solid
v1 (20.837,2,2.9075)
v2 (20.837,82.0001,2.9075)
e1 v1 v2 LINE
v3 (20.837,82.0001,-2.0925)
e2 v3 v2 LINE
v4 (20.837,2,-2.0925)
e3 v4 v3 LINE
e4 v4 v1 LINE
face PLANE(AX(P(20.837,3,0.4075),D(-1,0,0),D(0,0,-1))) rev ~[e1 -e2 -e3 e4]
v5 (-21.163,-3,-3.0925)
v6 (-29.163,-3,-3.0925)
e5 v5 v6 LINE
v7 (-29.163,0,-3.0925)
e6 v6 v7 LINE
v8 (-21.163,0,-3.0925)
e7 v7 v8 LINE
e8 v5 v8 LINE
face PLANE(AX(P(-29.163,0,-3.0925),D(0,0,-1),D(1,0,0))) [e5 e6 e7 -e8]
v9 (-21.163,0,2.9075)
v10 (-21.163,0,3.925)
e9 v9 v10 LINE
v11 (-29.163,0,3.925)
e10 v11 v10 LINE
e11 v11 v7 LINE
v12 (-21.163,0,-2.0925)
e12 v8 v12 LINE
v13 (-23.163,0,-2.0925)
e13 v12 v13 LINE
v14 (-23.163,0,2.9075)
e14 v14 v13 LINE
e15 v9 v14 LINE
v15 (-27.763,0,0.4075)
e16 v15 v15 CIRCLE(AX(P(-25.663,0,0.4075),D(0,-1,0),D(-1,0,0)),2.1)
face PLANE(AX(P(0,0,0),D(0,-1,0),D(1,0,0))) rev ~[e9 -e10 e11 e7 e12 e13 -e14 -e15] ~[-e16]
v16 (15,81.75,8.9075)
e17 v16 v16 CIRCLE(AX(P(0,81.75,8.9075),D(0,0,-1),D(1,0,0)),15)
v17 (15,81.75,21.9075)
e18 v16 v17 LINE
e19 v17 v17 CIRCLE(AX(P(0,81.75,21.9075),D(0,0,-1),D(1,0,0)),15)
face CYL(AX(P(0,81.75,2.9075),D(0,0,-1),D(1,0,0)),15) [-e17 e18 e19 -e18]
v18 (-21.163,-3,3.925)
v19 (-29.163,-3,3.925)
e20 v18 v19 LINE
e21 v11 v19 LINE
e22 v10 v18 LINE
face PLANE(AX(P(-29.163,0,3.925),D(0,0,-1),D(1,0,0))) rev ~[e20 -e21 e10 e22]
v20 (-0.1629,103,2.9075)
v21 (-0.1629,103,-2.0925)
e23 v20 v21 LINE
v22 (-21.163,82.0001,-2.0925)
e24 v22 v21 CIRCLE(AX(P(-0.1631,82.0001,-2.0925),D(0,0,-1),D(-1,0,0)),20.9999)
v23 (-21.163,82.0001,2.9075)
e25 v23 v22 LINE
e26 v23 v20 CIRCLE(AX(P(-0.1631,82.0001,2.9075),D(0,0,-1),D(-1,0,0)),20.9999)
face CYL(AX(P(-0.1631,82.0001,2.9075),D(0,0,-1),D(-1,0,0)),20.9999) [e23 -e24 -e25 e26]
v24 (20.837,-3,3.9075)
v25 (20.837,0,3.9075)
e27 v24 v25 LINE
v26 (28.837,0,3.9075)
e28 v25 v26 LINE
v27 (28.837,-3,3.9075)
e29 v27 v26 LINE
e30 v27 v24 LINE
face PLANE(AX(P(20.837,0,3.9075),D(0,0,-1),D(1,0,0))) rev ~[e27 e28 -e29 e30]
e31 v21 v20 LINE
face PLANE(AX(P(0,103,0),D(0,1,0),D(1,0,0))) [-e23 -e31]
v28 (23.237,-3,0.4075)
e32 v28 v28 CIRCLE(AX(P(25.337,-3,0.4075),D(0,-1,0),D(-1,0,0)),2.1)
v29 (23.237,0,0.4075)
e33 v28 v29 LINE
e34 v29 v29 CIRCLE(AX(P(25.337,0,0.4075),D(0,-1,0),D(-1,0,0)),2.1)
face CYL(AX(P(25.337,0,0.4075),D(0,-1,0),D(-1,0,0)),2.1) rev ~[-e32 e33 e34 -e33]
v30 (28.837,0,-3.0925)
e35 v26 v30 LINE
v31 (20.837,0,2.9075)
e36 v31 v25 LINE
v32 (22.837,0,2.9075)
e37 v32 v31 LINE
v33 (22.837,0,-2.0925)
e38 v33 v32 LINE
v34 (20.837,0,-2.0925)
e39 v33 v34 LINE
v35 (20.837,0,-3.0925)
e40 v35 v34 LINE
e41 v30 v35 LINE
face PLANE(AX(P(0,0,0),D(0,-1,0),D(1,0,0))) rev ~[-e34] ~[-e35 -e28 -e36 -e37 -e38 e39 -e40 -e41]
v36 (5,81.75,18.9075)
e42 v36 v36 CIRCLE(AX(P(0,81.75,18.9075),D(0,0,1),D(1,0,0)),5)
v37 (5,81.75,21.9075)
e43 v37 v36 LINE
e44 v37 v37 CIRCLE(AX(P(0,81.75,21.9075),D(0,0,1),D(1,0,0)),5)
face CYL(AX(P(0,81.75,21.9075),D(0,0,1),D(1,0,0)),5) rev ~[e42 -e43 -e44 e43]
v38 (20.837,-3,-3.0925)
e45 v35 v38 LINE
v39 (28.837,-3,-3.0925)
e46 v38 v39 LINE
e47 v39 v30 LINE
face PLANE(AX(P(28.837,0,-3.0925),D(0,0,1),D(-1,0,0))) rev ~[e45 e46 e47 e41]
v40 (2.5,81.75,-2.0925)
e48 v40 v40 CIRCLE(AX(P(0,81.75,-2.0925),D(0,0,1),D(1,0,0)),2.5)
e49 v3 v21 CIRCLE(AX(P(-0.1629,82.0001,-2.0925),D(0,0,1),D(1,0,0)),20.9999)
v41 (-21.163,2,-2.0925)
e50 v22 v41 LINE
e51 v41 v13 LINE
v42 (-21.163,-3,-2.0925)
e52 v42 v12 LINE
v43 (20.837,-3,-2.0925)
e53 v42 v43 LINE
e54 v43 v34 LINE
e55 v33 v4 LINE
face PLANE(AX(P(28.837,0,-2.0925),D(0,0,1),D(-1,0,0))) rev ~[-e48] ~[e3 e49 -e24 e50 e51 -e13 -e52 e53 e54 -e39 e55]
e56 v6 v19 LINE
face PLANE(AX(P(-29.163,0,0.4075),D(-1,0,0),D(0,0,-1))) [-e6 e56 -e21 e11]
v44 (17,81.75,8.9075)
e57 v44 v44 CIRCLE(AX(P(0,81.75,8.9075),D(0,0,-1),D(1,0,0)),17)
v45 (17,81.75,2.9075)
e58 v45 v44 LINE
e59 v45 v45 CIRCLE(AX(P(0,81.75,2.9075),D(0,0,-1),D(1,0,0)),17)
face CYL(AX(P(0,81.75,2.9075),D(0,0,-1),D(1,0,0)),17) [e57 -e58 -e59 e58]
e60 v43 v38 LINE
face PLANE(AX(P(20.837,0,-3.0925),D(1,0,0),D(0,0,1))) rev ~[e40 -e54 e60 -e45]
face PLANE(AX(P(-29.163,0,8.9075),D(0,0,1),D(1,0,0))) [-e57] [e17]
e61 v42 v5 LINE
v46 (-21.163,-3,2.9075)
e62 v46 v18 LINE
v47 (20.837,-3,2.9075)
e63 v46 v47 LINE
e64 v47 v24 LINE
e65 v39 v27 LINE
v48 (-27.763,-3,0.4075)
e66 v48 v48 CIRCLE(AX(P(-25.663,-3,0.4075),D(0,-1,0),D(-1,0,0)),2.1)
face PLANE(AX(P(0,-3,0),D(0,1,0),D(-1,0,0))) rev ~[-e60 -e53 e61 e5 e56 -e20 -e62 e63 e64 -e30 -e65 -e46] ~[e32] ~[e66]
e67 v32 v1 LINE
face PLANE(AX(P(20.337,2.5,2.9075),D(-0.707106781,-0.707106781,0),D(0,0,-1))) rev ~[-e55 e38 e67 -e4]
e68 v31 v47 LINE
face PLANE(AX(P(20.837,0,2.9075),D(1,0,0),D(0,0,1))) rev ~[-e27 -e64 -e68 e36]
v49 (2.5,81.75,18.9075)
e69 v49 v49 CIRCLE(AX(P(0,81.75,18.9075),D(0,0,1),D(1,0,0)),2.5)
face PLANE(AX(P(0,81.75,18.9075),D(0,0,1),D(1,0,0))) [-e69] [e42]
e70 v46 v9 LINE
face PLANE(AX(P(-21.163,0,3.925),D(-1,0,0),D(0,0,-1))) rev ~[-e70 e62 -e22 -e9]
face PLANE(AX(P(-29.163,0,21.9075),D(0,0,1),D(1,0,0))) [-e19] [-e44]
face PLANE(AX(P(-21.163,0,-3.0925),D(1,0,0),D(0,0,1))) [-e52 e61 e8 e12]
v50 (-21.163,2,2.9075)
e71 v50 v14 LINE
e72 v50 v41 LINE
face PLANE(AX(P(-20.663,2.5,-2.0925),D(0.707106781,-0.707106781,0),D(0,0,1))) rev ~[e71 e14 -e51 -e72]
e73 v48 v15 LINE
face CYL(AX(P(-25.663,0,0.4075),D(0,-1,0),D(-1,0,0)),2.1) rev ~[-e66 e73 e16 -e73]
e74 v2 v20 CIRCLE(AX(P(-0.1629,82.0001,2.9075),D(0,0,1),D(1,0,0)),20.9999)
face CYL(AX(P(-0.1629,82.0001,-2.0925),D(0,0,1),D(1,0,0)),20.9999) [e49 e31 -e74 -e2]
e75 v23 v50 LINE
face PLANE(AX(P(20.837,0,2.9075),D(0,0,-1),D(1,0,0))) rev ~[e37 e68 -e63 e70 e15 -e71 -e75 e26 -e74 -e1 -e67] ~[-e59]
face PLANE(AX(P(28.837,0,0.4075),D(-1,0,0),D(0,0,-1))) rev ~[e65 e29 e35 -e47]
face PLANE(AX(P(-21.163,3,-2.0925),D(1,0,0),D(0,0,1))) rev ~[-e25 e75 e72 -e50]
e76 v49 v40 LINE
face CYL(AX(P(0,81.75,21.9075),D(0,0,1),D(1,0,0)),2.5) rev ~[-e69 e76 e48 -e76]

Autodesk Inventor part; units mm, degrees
ref_plane "YZ Plane" through (0, 0, 0) normal (1, 0, 0) x (0, 1, 0)
ref_plane "XZ Plane" through (0, 0, 0) normal (0, 1, 0) x (-1, 0, 0)
ref_plane "XY Plane" through (0, 0, 0) normal (0, 0, 1) x (1, 0, 0)
sketch "Szkic1" plane through (0, 0, 0) normal (0, 1, 0) x (-1, 0, 0)
  line L0 (-28.837, -2.0925) -> (29.163, -2.0925)
  line L1 (29.163, 2.9075) -> (29.163, -2.0925)
  line L2 (-28.837, -2.0925) -> (29.163, -2.0925)
  line L3 (29.163, -2.0925) -> (29.163, 2.9075)
  line L4 (29.163, 2.9075) -> (-28.837, 2.9075)
  line L5 (-28.837, 2.9075) -> (-28.837, -2.0925)
  circle A0 centre (-25.337, 0.4075) radius 2.1
  circle A1 centre (-25.337, 0.4075) radius 2.1
  circle A2 centre (25.663, 0.4075) radius 2.1
  circle A3 centre (25.663, 0.4075) radius 2.1
  line L6 (0.163, -2.0925) -> (0.163, 2.9075)
  line L7 (29.163, 0.4075) -> (-28.837, 0.4075)
  line L8 (-20.837, -2.0925) -> (21.163, -2.0925)
  line L9 (21.163, -2.0925) -> (21.163, 2.9075)
  line L10 (21.163, 2.9075) -> (-20.837, 2.9075)
  line L11 (-20.837, 2.9075) -> (-20.837, -2.0925)
  line L12 (-20.837, -2.0925) -> (21.163, 2.9075) construction
  line L13 (21.163, -2.0925) -> (-20.837, 2.9075) construction
  point P0 (0, 0)
  point P1 (0.163, 0.4075)
  dimension "d14" = 42
  dimension "d15" = 5
  dimension "d16" = 4.5
  dimension "d17" = 4.5
  dimension "d18" = 8
  dimension "d19" = 8
extrude "Wyciągnięcie proste1" add sketch "Szkic1" along normal blind 3 contours L5 L7 A0 L11 L0 | L11 L7 L6 L0 | L5 L4 L11 L7 A0 | L6 L7 L9 L0 | L11 L4 L6 L7 | L9 L7 A2 L1 L0 | L6 L4 L9 L7 | L9 L4 L1 L7 A2
sketch "Szkic2" plane through (0, 3, 0) normal (0, 1, 0) x (1, 0, 0)
  line L0 (-29.163, 2.0925) -> (-29.163, -2.9075) projected
  line L1 (-29.163, -0.4075) -> (-21.163, -0.4075)
  line L2 (28.837, -2.9075) -> (28.837, 2.0925) projected
  line L3 (28.837, -0.4075) -> (20.837, -0.4075)
  line L4 (-29.163, -2.9075) -> (28.837, -2.9075) projected
  line L5 (20.837, -0.4075) -> (-21.163, -0.4075)
  line L6 (-21.163, -0.4075) -> (-21.163, -2.9075)
  line L7 (-21.163, -2.9075) -> (20.837, -2.9075)
  line L8 (20.837, -2.9075) -> (20.837, -0.4075)
  line L9 (28.837, 2.0925) -> (-29.163, 2.0925) projected
  line L10 (-21.163, -0.4075) -> (20.837, -0.4075)
  line L11 (20.837, -0.4075) -> (20.837, 2.0925)
  line L12 (20.837, 2.0925) -> (-21.163, 2.0925)
  line L13 (-21.163, 2.0925) -> (-21.163, -0.4075)
  point P0 (0, 0)
  point P1 (20.837, -2.9075)
  point P2 (20.837, -0.4075)
  dimension "d2" = 8
  dimension "d3" = 8
extrude "Wyciągnięcie proste2" add sketch "Szkic2" along normal blind 100 contours L9 L11 L5 L13 | L5 L8 L4 L6
fillet "Zaokrąglenie1" radius 21 2 edges at (20.837, 103, 0.4075) (-21.163, 103, 0.4075)
sketch "Szkic3" plane through (-29.163, 0, 2.9075) normal (0, 0, 1) x (1, 0, 0)
  line L0 (29.163, 0) -> (29.163, 81.75)
  circle A0 centre (29.163, 81.75) radius 15
  line L1 (29.163, 0) -> (29.163, 21)
  line L2 (8.163, 0) -> (50.163, 0)
  line L3 (50.163, 0) -> (50.163, 42)
  line L4 (50.163, 42) -> (8.163, 42)
  line L5 (8.163, 42) -> (8.163, 0)
  line L6 (8.163, 0) -> (50.163, 42) construction
  line L7 (50.163, 0) -> (8.163, 42) construction
  dimension "d7" = 81.75
  dimension "d8" = 30
  dimension "d28" = 21
  dimension "d29" = 42
  dimension "d30" = 42
extrude "Wyciągnięcie proste3" add sketch "Szkic3" along normal blind 19 contours A0
sketch "Szkic4" plane through (-29.163, 0, 2.9075) normal (0, 0, 1) x (1, 0, 0)
  circle A0 centre (29.163, 81.75) radius 15 projected
  circle A1 centre (29.163, 81.75) radius 17
  point P0 (29.163, 0)
  dimension "d11" = 34
extrude "Wyciągnięcie proste4" add sketch "Szkic4" along normal blind 6
sketch "Szkic5" plane through (0, 0, 0) normal (0, -1, 0) x (1, 0, 0)
  point P0 (0, 0)
sketch "Szkic6" plane through (0, 0, 0) normal (0, -1, 0) x (1, 0, 0)
  line L0 (-21.163, 2.9075) -> (-21.163, -2.0925) projected
  line L1 (-21.163, 2.9075) -> (-29.163, 2.9075)
  line L2 (-29.163, 2.9075) -> (-29.163, -3.0925)
  line L3 (-29.163, -3.0925) -> (-21.163, -3.0925)
  line L4 (-21.163, -3.0925) -> (-21.163, 2.9075)
  line L5 (-21.163, -2.075) -> (-29.163, -2.075)
  line L6 (-29.163, -2.075) -> (-29.163, 3.925)
  line L7 (-29.163, 3.925) -> (-21.163, 3.925)
  line L8 (-21.163, 3.925) -> (-21.163, -2.075)
  line L9 (28.837, -2.0925) -> (-29.163, -2.0925) projected
  line L10 (-29.163, 2.9075) -> (28.837, -2.0925)
  line L11 (28.837, 2.9075) -> (-29.163, -2.0925)
  line L12 (28.837, -2.0925) -> (20.837, -2.0925)
  line L13 (20.837, -2.0925) -> (20.837, 3.9075)
  line L14 (20.837, 3.9075) -> (28.837, 3.9075)
  line L15 (28.837, 3.9075) -> (28.837, -2.0925)
  line L16 (20.837, -2.0925) -> (20.837, 2.9075) projected
  line L17 (20.837, 2.9075) -> (28.837, 2.9075)
  line L18 (28.837, 2.9075) -> (28.837, -3.0925)
  line L19 (28.837, -3.0925) -> (20.837, -3.0925)
  line L20 (20.837, -3.0925) -> (20.837, 2.9075)
  point P0 (0, 0)
  point P1 (20.837, -2.0925)
  point P2 (-21.163, -2.0925)
  dimension "d20" = 6
  dimension "d21" = 6
  dimension "d22" = 6
extrude "Wyciągnięcie proste5" add sketch "Szkic6" against normal blind 3 contours L4 L3 L2 L9 | L9 L18 L19 L20 | L1 L6 L7 L8 | L17 L13 L14 L15
chamfer "Faza1" distance 2 angle 45 2 edges at (20.837, 3, 0.4075) (-21.163, 3, 0.4075)
sketch "Szkic7" plane through (0, 81.75, 21.9075) normal (0, 0, 1) x (1, 0, 0)
  circle A0 centre (0, 0) radius 2.5
  point P0 (0, -81.75)
  dimension "d31" = 5
extrude "Wyciągnięcie proste6" cut sketch "Szkic7" against normal blind 53
sketch "Szkic8" plane through (0, 81.75, 21.9075) normal (0, 0, 1) x (1, 0, 0)
  circle A0 centre (0, 0) radius 2.5 projected
  circle A1 centre (0, 0) radius 5
  point P0 (0, -81.75)
  dimension "d34" = 10
extrude "Wyciągnięcie proste7" cut sketch "Szkic8" against normal blind 3
move faces "Przesuń1" translate (0, -3, 0) faces at (28.3703, 3, 0.4075) (22.1703, 3.6667, -0.4258) (6.837, 0, -0.4258) (-0.2091, 29.7561, -2.0925) (-22.4963, 3.6667, 1.2408) (-28.6963, 3, 0.4133)
properties part number "baza_rama_cz2"
